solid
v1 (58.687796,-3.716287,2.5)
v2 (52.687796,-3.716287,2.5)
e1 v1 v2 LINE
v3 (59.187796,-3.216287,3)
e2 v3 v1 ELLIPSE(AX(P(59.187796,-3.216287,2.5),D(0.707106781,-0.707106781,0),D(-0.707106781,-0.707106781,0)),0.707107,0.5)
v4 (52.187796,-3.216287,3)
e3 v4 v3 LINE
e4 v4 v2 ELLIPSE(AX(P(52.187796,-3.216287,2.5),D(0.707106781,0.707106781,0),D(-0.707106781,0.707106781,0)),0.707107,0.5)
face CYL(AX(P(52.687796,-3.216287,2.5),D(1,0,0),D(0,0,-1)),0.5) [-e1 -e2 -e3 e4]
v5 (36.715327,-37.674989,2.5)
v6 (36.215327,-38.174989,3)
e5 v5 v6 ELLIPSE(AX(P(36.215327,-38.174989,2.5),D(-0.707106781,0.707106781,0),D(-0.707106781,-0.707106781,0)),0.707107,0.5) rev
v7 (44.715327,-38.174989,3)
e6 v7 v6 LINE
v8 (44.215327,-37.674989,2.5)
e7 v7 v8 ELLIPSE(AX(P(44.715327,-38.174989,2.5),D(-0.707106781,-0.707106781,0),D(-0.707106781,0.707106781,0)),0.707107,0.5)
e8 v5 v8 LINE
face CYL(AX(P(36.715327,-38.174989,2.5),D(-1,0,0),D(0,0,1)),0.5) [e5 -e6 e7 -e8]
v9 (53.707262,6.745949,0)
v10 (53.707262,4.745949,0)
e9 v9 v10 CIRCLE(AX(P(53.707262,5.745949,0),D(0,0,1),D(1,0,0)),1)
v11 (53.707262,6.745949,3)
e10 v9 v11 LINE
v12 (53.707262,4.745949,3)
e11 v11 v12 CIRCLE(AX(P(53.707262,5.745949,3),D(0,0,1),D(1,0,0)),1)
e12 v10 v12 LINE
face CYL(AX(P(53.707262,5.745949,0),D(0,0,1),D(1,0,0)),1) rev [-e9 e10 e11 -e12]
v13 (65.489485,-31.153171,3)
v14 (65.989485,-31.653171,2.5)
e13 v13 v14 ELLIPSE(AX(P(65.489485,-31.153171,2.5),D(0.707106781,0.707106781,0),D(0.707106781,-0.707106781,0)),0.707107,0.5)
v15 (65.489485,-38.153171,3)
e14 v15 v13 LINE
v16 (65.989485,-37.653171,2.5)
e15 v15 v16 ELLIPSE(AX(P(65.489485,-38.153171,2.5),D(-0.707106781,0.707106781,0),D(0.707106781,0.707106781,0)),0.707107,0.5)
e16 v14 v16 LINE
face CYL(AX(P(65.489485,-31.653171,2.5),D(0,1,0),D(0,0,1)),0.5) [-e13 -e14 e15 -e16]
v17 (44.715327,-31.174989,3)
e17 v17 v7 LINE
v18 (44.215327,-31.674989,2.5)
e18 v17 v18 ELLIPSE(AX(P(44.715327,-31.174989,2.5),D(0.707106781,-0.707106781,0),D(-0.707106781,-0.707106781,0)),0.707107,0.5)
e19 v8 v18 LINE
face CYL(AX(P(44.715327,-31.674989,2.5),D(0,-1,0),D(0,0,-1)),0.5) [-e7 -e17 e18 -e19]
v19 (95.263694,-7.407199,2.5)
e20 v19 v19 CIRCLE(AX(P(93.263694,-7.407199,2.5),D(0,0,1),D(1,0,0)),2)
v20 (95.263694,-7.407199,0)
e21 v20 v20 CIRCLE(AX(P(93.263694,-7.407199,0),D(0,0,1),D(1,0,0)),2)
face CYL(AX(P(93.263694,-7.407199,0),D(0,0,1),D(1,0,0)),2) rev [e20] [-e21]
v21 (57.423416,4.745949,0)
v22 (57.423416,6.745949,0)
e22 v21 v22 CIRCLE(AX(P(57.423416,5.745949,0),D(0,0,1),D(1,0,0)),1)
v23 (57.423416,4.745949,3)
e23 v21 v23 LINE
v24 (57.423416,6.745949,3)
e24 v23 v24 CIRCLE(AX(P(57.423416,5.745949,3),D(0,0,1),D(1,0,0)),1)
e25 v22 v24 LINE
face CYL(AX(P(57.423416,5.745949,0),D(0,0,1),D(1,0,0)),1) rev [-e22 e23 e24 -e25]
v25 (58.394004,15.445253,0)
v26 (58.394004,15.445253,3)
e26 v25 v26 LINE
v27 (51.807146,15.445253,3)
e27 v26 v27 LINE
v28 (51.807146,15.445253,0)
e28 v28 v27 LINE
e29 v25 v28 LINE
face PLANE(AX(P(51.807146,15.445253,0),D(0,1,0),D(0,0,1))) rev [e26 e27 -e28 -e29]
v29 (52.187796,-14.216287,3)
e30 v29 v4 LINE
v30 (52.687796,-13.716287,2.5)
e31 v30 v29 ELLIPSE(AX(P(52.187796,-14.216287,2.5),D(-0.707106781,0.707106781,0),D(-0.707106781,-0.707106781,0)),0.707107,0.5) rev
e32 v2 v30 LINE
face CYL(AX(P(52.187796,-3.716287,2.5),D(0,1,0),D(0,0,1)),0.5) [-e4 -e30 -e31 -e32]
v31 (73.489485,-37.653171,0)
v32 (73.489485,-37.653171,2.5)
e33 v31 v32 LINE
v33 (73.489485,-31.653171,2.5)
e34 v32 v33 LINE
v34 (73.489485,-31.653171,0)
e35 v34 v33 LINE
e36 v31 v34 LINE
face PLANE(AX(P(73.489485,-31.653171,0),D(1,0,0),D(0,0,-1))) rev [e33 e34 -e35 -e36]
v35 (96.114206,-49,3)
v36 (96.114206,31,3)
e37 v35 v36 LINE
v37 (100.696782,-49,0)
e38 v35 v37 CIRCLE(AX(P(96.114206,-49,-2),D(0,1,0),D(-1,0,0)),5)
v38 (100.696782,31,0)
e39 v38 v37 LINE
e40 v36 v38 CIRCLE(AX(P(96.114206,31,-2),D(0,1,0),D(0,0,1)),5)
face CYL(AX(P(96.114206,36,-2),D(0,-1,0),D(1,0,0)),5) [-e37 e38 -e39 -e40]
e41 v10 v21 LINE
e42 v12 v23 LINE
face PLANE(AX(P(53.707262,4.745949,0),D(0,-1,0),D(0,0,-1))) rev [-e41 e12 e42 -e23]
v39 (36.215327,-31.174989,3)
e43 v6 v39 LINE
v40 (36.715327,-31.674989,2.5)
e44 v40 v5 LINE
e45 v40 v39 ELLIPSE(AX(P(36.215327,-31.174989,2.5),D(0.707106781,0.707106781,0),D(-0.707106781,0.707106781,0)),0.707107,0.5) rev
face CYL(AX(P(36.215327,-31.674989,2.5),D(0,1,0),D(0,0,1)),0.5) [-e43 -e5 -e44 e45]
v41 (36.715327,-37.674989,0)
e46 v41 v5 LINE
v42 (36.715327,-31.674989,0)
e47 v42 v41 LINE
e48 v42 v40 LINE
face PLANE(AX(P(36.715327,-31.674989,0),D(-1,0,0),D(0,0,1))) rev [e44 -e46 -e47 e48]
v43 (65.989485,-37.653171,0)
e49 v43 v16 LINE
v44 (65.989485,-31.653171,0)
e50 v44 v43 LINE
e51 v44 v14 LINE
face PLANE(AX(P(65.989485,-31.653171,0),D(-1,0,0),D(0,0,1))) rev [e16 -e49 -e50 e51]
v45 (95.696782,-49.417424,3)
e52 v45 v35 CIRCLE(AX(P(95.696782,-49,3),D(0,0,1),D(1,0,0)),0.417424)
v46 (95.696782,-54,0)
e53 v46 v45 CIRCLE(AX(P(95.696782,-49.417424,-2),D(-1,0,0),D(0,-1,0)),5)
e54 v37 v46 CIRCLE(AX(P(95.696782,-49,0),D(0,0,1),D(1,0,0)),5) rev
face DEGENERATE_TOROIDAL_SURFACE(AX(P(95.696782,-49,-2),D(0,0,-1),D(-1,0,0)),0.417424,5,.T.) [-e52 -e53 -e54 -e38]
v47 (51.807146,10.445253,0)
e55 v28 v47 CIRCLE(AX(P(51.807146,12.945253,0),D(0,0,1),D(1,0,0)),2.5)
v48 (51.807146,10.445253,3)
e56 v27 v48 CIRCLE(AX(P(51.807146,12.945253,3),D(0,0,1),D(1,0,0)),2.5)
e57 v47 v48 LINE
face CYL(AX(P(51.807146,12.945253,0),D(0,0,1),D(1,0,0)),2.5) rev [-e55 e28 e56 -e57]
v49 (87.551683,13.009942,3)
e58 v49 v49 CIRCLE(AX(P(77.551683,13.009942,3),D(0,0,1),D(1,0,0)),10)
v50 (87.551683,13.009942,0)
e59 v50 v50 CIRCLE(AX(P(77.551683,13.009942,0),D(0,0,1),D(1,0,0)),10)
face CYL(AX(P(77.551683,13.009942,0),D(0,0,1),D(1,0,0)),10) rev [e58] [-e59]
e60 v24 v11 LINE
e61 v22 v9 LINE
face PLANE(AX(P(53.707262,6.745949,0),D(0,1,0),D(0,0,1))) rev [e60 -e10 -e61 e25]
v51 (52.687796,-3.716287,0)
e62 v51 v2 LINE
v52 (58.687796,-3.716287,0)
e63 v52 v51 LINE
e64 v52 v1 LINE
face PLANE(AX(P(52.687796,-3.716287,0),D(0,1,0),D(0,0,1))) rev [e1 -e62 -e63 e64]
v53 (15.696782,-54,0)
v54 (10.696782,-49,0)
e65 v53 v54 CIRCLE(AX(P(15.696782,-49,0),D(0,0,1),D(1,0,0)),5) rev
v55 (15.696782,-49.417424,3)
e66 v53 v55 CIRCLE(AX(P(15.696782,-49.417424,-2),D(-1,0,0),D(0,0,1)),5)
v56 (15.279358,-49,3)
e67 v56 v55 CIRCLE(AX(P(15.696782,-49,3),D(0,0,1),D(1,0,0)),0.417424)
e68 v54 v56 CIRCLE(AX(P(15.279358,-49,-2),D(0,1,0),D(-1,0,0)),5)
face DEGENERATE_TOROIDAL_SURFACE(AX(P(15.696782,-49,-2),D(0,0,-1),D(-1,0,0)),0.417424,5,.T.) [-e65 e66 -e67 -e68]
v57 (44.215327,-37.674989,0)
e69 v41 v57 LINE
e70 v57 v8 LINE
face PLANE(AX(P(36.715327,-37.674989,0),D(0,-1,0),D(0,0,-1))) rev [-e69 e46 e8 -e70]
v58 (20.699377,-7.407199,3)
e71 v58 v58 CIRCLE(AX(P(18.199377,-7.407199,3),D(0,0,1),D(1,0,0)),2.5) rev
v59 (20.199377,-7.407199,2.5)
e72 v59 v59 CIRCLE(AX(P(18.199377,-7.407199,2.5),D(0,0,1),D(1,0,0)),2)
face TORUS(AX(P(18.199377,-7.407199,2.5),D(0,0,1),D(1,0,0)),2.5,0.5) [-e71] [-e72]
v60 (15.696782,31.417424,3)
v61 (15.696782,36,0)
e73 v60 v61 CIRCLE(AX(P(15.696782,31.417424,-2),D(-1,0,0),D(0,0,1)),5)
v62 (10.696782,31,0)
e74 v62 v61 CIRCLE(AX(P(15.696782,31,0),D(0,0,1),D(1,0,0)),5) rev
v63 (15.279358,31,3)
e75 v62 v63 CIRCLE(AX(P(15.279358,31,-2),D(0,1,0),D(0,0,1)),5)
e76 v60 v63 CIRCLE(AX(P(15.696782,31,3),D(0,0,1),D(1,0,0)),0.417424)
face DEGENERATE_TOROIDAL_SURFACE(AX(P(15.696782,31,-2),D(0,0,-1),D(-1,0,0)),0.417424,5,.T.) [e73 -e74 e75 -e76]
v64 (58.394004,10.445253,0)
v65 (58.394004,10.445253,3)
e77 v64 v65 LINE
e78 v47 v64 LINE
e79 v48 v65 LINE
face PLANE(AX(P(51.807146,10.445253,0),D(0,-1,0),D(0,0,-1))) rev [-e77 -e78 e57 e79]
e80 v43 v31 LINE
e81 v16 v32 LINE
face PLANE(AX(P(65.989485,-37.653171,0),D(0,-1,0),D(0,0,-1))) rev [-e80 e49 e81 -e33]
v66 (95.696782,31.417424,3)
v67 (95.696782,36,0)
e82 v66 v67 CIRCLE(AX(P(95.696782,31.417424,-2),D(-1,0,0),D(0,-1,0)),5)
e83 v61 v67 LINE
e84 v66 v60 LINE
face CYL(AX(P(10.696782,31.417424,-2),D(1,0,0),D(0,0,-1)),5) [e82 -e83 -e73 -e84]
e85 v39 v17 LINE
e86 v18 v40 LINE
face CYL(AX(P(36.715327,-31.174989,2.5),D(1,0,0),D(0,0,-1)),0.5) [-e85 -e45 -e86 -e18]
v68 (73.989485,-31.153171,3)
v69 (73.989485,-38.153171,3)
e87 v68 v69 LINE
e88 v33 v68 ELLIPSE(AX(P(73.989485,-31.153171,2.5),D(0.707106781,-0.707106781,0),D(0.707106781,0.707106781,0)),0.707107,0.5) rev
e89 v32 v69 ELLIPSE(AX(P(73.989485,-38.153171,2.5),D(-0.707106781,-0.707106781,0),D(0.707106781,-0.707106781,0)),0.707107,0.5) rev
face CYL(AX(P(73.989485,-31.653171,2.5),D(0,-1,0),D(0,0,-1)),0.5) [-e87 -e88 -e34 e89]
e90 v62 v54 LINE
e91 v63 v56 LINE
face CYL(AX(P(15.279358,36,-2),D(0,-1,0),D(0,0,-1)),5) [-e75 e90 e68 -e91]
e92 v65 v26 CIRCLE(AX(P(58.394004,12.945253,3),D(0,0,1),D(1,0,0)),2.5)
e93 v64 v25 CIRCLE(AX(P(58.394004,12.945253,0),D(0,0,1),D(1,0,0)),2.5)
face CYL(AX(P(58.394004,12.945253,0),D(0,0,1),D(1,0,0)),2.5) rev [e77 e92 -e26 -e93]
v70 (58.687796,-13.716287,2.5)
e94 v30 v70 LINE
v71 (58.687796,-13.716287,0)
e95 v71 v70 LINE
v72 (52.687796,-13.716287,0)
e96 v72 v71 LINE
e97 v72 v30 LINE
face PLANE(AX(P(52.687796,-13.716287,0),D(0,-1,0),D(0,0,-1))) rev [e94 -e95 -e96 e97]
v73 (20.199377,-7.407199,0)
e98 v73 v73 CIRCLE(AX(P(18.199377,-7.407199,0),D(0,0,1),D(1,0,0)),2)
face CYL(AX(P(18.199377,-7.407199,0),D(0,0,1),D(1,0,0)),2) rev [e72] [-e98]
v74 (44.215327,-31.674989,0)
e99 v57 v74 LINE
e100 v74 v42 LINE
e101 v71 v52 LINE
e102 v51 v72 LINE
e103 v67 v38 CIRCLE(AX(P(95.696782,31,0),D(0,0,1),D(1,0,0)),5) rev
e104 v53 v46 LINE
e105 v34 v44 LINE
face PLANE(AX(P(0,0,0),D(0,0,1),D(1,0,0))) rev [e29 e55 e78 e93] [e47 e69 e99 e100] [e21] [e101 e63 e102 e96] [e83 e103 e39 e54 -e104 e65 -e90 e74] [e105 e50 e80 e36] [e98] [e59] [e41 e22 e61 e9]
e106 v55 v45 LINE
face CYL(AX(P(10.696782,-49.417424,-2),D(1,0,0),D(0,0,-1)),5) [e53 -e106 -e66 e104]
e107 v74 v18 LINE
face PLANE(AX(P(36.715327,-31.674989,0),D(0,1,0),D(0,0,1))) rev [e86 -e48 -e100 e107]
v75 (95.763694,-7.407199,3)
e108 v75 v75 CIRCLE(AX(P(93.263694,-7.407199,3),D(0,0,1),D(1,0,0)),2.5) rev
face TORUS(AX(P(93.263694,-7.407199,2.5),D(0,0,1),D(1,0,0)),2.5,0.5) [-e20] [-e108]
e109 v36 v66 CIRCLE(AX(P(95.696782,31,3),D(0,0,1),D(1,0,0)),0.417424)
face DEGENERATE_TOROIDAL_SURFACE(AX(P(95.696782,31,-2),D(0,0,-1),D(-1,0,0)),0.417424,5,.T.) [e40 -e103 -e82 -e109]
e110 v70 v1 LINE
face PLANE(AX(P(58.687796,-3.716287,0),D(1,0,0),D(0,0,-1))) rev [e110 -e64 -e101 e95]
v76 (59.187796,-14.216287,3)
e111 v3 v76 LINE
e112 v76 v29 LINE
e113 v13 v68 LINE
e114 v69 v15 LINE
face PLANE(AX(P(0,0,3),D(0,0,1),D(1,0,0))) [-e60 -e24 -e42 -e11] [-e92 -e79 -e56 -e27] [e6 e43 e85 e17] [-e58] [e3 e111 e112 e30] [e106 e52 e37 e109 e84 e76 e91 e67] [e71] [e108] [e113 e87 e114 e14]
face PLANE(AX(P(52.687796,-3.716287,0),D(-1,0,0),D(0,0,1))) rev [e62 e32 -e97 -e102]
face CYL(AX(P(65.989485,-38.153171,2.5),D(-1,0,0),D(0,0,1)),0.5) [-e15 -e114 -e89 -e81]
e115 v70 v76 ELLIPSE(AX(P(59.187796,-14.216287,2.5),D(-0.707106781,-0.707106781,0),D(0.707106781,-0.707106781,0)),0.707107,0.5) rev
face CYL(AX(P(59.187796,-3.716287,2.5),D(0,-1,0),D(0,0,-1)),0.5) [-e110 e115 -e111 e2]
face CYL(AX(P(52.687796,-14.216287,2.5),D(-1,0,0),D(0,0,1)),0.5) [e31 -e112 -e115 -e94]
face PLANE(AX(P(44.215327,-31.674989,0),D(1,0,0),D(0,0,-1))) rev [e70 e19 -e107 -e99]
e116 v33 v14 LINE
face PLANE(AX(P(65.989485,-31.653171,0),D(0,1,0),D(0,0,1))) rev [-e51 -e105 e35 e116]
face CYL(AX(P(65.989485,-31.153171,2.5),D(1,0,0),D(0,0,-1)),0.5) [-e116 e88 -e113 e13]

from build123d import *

# Parameters (mm, degrees)
SKETCH1_W           = 90
SKETCH1_H           = 90
BOSS_EXTRUDE5_DEPTH = 3
FILLET14_R          = 5
FILLET15_R          = 5
SKETCH17_R          = 10
SKETCH17_R_2        = 2
SKETCH17_W          = 7.5
SKETCH17_H          = 6
SKETCH17_W_2        = 6
SKETCH17_H_2        = 10
CUT_EXTRUDE4_DEPTH  = 3
FILLET16_R          = 0.5


with BuildPart() as part:
    # Sketch1 → Boss-Extrude5 (new body)
    with BuildSketch(Plane.XY):
        with Locations((55.696781823, -9)):
            Rectangle(SKETCH1_W, SKETCH1_H)
    extrude(amount=BOSS_EXTRUDE5_DEPTH)

    # Fillet14
    fillet14_edges = [part.edges().sort_by_distance(p)[0] for p in [
        (10.696781823, 36, 1.5),
        (100.696781823, 36, 1.5),
        (100.696781823, -54, 1.5),
        (10.696781823, -54, 1.5),
    ]]
    fillet(fillet14_edges, radius=FILLET14_R)

    # Fillet15
    # the kernel refuses this fillet: 5 mm, written as the material it takes off along each edge
    with BuildSketch(Plane(origin=(15.696781823, 31, 3), x_dir=(0, 1, 0), z_dir=(1, 0, 0))) as fillet15_piece_1:
        with BuildLine():
            CenterArc((0.417424305, -5), FILLET15_R, 23.578178478, 66.421821522)
            Line((0.417424305, 0), (0.417424305, 0.1))
            Line((0.417424305, 0.1), (5, 0.1))
            Line((5, 0.1), (5.1, 0))
            ThreePointArc((5.1, 0), (5.1, -1.5), (5.091651514, -2.96))
            Line((5.091651514, -2.96), (5, -3))
        make_face()
    revolve(axis=Axis((15.696781823, 31, 3), (0, 0, 1)), revolution_arc=90, mode=Mode.SUBTRACT)
    with BuildSketch(Plane(origin=(15.696781823, 36, 3), x_dir=(0, 0, -1), z_dir=(1, 0, 0))) as fillet15_piece_2:
        with BuildLine():
            CenterArc((5, -4.582575695), FILLET15_R, 113.578178478, 66.421821522)
            Line((0, -4.582575695), (-0.1, -4.582575695))
            Line((-0.1, -4.582575695), (-0.1, 0))
            Line((-0.1, 0), (0, 0.1))
            ThreePointArc((0, 0.1), (1.5, 0.1), (2.96, 0.091651514))
            Line((2.96, 0.091651514), (3, 0))
        make_face()
    extrude(amount=80, mode=Mode.SUBTRACT)
    with BuildSketch(Plane(origin=(95.696781823, 31, 3), x_dir=(0, 1, 0), z_dir=(-1, 0, 0))) as fillet15_piece_3:
        with BuildLine():
            CenterArc((0.417424305, 5), FILLET15_R, 270, 66.421821522)
            Line((0.417424305, 0), (0.417424305, -0.1))
            Line((0.417424305, -0.1), (5, -0.1))
            Line((5, -0.1), (5.1, 0))
            ThreePointArc((5.1, 0), (5.1, 1.5), (5.091651514, 2.96))
            Line((5.091651514, 2.96), (5, 3))
        make_face()
    revolve(axis=Axis((95.696781823, 31, 3), (0, 0, -1)), revolution_arc=90, mode=Mode.SUBTRACT)
    with BuildSketch(Plane(origin=(100.696781823, 31, 3), x_dir=(-1, 0, 0), z_dir=(0, -1, 0)), Plane(origin=(95.696781823, -54, 3), x_dir=(0, 1, 0), z_dir=(-1, 0, 0)), Plane(origin=(10.696781823, -49, 3), x_dir=(1, 0, 0), z_dir=(0, 1, 0))) as fillet15_piece_4:
        with BuildLine():
            CenterArc((4.582575695, 5), FILLET15_R, 203.578178478, 66.421821522)
            Line((0, 3), (-0.091651514, 2.96))
            ThreePointArc((-0.091651514, 2.96), (-0.1, 1.5), (-0.1, 0))
            Line((-0.1, 0), (0, -0.1))
            Line((0, -0.1), (4.582575695, -0.1))
            Line((4.582575695, -0.1), (4.582575695, 0))
        make_face()
    extrude(amount=80, mode=Mode.SUBTRACT)
    with BuildSketch(Plane(origin=(95.696781823, -49, 3), x_dir=(1, 0, 0), z_dir=(0, 1, 0))) as fillet15_piece_5:
        with BuildLine():
            CenterArc((0.417424305, 5), FILLET15_R, 270, 66.421821522)
            Line((5, 3), (5.091651514, 2.96))
            ThreePointArc((5.091651514, 2.96), (5.1, 1.5), (5.1, 0))
            Line((5.1, 0), (5, -0.1))
            Line((5, -0.1), (0.417424305, -0.1))
            Line((0.417424305, -0.1), (0.417424305, 0))
        make_face()
    revolve(axis=Axis((95.696781823, -49, 3), (0, 0, -1)), revolution_arc=90, mode=Mode.SUBTRACT)
    with BuildSketch(Plane(origin=(15.696781823, -49, 3), x_dir=(0, -1, 0), z_dir=(1, 0, 0))) as fillet15_piece_6:
        with BuildLine():
            CenterArc((0.417424305, 5), FILLET15_R, 270, 66.421821522)
            Line((5, 3), (5.091651514, 2.96))
            ThreePointArc((5.091651514, 2.96), (5.1, 1.5), (5.1, 0))
            Line((5.1, 0), (5, -0.1))
            Line((5, -0.1), (0.417424305, -0.1))
            Line((0.417424305, -0.1), (0.417424305, 0))
        make_face()
    revolve(axis=Axis((15.696781823, -49, 3), (0, 0, -1)), revolution_arc=90, mode=Mode.SUBTRACT)

    # Sketch17 → Cut-Extrude4 (cut)
    with BuildSketch(Plane.XY.offset(3)):
        with Locations((77.551683104, 13.009941811)):
            Circle(SKETCH17_R)
        with Locations((18.19937678, -7.407199345)):
            Circle(SKETCH17_R_2)
        with Locations((93.263694242, -7.407199345)):
            Circle(SKETCH17_R_2)
        with Locations((69.739484947, -34.653171103)):
            Rectangle(SKETCH17_W, SKETCH17_H)
        with Locations((55.687795517, -8.716286613)):
            Rectangle(SKETCH17_W_2, SKETCH17_H_2)
        with Locations((40.465326937, -34.674989483)):
            Rectangle(SKETCH17_W, SKETCH17_H)
        with BuildLine():
            Line((53.707261797, 6.745948723), (57.423415647, 6.745948723))
            ThreePointArc((57.423415647, 6.745948723), (58.423415647, 5.745948723), (57.423415647, 4.745948723))
            Line((57.423415647, 4.745948723), (53.707261797, 4.745948723))
            ThreePointArc((53.707261797, 4.745948723), (52.707261797, 5.745948723), (53.707261797, 6.745948723))
        make_face()
        with BuildLine():
            Line((51.807146289, 15.44525347), (58.394003545, 15.44525347))
            ThreePointArc((58.394003545, 15.44525347), (60.894003545, 12.94525347), (58.394003545, 10.44525347))
            Line((58.394003545, 10.44525347), (51.807146289, 10.44525347))
            ThreePointArc((51.807146289, 10.44525347), (49.307146289, 12.94525347), (51.807146289, 15.44525347))
        make_face()
    extrude(amount=-CUT_EXTRUDE4_DEPTH, mode=Mode.SUBTRACT)

    # Fillet16
    fillet16_edges = [part.edges().sort_by_distance(p)[0] for p in [
        (16.19937678, -7.407199345, 3),
        (91.263694242, -7.407199345, 3),
        (52.687795517, -8.716286613, 3),
        (55.687795517, -13.716286613, 3),
        (58.687795517, -8.716286613, 3),
        (55.687795517, -3.716286613, 3),
        (36.715326937, -34.674989483, 3),
        (40.465326937, -37.674989483, 3),
        (44.215326937, -34.674989483, 3),
        (40.465326937, -31.674989483, 3),
        (65.989484947, -34.653171103, 3),
        (69.739484947, -37.653171103, 3),
        (73.489484947, -34.653171103, 3),
        (69.739484947, -31.653171103, 3),
    ]]
    fillet(fillet16_edges, radius=FILLET16_R)


solid = part.part
